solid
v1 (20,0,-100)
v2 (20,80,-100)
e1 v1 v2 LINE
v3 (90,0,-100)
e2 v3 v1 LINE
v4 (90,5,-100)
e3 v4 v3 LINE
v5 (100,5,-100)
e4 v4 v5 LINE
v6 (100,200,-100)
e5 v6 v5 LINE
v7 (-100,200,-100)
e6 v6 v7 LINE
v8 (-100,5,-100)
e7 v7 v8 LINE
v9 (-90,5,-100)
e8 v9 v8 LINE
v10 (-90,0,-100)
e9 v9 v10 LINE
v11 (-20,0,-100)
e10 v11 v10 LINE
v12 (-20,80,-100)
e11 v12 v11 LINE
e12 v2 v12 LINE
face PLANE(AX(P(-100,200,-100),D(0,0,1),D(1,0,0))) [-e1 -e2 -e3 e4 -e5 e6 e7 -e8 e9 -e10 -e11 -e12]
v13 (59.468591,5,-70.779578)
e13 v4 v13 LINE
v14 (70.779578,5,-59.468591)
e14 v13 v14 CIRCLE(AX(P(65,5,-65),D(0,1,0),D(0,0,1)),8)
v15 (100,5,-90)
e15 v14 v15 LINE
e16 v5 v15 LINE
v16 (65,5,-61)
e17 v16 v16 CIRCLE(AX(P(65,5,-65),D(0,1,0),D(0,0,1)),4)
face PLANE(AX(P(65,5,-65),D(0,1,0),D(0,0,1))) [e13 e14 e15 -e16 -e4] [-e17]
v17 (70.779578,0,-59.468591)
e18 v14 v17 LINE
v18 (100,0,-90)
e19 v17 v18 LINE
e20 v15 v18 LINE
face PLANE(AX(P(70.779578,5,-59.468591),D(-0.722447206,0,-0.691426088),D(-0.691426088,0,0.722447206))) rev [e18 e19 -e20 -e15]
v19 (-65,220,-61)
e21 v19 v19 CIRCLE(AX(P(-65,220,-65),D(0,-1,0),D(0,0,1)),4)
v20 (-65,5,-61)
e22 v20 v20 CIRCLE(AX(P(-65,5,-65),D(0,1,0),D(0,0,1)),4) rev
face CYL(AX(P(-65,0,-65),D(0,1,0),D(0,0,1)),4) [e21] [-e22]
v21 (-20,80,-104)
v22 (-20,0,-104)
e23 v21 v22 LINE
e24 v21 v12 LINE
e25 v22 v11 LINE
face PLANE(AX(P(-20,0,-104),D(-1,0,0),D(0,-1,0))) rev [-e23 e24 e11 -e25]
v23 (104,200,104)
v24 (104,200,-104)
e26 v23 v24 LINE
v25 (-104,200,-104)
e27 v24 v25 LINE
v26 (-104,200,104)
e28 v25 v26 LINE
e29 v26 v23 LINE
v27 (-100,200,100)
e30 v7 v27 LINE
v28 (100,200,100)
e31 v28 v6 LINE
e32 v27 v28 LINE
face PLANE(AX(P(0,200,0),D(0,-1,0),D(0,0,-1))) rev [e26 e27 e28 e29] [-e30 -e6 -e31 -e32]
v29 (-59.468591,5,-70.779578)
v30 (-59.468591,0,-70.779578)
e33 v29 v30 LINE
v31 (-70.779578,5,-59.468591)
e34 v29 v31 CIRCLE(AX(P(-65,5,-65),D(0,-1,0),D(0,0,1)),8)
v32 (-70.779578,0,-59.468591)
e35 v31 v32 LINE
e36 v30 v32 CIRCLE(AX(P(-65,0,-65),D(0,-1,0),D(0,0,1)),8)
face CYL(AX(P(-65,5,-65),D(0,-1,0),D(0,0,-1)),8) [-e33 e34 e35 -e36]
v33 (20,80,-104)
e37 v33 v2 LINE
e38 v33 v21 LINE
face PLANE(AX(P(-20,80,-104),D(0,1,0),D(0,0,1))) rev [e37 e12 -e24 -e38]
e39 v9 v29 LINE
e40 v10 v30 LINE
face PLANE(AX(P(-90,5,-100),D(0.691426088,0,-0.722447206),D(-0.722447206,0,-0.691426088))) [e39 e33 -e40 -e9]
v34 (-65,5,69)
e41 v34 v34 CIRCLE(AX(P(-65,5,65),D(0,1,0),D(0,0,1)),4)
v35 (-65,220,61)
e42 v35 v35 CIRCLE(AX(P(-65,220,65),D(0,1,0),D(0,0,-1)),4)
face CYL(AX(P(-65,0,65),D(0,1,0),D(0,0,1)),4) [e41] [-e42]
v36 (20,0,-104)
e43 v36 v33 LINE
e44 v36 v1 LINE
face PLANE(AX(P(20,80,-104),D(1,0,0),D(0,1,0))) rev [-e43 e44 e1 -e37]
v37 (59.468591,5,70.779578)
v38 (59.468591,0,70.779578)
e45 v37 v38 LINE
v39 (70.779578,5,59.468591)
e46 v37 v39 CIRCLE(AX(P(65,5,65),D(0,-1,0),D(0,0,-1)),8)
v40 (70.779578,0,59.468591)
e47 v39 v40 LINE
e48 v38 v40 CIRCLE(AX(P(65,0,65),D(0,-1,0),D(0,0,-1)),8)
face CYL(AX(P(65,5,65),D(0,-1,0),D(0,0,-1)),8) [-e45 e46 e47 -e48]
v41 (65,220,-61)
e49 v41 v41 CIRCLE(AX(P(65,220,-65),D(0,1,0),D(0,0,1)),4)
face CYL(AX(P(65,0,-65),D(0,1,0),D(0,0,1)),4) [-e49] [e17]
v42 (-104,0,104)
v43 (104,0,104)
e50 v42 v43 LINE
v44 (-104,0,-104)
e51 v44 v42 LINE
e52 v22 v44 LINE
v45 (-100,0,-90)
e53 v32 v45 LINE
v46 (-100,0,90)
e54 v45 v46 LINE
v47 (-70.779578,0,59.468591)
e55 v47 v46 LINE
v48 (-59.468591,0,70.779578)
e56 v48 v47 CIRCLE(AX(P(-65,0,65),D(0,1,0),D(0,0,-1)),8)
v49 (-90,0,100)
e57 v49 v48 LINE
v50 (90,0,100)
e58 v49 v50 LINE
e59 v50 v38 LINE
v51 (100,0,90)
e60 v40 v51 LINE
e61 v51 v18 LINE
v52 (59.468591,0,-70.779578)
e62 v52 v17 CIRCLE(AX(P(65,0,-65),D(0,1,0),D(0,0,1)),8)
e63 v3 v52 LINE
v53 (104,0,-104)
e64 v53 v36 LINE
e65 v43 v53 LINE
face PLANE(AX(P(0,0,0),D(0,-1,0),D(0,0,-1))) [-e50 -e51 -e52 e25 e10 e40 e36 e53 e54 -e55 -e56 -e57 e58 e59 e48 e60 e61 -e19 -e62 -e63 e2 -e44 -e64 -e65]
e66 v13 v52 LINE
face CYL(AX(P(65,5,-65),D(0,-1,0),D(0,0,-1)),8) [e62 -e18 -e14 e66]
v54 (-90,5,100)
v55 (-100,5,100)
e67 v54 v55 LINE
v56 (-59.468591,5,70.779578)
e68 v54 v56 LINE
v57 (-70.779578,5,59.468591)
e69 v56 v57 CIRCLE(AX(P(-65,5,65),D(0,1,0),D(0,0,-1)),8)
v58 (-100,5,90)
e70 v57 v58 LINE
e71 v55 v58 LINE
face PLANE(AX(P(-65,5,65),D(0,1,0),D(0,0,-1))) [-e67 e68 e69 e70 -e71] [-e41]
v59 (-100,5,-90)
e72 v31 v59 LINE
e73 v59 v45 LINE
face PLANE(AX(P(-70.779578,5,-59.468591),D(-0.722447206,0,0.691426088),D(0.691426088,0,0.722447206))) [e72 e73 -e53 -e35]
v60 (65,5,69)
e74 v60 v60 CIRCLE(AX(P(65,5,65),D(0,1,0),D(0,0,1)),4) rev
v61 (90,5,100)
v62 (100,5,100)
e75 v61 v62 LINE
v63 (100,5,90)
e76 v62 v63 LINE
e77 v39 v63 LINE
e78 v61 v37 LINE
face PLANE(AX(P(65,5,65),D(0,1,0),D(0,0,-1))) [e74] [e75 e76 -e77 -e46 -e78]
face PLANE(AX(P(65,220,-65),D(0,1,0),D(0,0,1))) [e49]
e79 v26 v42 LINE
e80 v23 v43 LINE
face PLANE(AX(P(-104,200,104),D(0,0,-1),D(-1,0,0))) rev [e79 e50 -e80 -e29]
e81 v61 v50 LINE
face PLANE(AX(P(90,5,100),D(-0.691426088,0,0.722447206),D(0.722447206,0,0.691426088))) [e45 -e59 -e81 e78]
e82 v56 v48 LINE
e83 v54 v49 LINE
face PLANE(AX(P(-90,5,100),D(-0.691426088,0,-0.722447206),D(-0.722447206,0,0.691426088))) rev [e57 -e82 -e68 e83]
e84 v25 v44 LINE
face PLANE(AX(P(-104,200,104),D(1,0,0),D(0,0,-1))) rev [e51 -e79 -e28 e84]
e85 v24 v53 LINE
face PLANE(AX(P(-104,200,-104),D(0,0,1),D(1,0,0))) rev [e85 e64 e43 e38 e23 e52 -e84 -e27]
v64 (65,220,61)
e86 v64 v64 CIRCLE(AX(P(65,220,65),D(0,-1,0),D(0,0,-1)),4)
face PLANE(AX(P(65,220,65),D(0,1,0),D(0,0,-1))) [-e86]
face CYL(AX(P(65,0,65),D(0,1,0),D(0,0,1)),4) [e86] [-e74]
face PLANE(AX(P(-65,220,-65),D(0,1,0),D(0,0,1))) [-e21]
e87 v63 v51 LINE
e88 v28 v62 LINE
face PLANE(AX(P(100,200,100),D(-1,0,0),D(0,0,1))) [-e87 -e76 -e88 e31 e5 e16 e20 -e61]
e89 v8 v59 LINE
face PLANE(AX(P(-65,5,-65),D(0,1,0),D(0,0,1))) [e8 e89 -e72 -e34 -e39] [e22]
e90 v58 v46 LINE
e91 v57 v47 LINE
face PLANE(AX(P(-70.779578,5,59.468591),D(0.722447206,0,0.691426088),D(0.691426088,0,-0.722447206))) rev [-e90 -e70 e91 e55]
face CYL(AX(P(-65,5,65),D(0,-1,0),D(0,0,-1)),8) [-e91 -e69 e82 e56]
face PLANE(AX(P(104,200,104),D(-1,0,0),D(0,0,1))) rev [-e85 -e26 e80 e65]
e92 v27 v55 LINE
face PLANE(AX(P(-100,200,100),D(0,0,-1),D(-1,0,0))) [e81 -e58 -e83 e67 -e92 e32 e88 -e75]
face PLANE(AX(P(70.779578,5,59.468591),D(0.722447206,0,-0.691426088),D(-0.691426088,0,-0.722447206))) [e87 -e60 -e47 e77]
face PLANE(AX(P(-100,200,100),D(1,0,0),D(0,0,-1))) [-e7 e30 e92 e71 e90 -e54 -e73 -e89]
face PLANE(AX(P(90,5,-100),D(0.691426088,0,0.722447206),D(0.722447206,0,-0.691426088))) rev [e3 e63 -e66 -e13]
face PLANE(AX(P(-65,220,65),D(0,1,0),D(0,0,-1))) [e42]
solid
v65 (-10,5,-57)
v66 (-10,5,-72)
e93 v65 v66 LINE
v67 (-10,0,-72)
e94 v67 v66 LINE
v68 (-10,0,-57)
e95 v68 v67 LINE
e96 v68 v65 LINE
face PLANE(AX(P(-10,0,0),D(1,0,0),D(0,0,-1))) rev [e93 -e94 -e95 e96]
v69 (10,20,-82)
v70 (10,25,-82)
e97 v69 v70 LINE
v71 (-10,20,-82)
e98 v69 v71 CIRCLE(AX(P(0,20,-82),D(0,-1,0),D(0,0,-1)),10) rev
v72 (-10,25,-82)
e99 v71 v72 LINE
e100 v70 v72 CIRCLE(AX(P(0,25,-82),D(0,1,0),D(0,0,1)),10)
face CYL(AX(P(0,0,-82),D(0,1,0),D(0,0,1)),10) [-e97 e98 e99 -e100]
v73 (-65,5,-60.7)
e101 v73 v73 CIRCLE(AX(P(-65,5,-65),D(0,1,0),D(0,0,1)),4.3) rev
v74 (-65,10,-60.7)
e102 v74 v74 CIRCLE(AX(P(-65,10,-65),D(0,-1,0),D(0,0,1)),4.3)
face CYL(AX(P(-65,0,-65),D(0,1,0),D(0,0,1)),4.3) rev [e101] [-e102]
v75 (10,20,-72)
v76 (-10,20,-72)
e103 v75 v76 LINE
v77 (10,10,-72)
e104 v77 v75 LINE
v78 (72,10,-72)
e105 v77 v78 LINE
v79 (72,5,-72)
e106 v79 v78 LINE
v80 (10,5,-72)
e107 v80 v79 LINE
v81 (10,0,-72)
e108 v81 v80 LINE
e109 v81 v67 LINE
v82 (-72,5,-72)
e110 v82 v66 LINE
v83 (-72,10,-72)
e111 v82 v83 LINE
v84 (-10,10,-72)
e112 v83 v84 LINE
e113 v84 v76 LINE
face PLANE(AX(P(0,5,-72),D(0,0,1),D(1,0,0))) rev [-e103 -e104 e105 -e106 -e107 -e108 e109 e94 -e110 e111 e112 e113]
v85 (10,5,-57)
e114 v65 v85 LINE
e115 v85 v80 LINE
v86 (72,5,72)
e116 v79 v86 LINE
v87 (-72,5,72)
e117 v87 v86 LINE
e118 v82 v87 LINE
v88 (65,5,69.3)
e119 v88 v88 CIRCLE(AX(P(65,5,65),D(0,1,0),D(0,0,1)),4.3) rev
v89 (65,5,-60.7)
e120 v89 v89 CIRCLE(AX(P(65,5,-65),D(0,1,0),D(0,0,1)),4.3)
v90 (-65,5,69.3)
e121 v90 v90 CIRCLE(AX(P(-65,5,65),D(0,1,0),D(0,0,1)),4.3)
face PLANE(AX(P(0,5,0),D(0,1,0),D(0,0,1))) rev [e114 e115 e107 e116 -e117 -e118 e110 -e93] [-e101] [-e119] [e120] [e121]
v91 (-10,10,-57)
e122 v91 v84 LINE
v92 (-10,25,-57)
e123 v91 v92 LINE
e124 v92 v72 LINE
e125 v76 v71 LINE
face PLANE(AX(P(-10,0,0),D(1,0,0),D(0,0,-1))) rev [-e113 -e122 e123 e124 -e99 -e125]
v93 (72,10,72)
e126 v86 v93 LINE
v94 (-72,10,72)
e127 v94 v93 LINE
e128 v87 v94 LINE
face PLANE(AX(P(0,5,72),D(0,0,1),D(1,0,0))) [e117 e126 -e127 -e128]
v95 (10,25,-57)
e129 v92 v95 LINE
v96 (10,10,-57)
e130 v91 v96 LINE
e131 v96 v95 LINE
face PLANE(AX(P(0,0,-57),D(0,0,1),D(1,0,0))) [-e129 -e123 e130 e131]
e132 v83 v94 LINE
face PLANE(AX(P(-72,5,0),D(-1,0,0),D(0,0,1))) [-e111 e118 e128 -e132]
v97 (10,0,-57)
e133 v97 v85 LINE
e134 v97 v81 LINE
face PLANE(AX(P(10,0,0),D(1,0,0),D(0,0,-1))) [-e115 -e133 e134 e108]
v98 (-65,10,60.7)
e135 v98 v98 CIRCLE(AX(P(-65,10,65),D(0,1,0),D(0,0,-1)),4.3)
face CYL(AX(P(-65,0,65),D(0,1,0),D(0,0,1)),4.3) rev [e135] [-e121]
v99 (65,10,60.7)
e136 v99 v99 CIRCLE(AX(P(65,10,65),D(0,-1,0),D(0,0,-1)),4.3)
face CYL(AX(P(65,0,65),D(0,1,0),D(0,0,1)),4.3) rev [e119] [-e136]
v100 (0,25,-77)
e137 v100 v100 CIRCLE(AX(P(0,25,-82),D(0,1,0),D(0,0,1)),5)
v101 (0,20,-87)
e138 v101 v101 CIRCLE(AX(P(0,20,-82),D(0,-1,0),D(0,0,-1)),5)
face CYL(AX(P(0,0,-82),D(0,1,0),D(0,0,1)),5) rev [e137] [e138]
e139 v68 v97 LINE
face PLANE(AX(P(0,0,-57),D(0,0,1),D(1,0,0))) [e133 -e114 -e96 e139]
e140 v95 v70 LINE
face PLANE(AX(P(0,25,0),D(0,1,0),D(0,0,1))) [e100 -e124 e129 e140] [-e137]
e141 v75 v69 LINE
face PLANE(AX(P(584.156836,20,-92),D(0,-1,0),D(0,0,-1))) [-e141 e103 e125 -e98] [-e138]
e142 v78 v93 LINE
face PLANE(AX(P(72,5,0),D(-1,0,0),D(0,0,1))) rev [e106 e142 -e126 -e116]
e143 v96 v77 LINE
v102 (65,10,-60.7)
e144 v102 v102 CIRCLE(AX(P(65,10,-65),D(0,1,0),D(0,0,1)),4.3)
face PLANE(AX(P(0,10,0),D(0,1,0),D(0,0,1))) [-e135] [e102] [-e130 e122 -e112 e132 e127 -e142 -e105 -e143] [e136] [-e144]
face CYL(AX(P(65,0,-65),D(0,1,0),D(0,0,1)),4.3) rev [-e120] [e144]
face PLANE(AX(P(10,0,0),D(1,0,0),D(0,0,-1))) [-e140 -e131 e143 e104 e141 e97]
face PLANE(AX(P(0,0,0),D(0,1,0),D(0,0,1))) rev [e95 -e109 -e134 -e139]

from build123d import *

# Parameters (mm, degrees)
SKETCH1_W                                  = 208
SKETCH1_H                                  = 208
SKETCH1_W_2                                = 200
SKETCH1_H_2                                = 200
BOSS_EXTRUDE1_DEPTH                        = 200
SKETCH3_W                                  = 40
SKETCH3_H                                  = 80
CUT_EXTRUDE1_DEPTH                         = 249.257930387
SKETCH4_W                                  = 144
SKETCH4_H                                  = 144
BOSS_EXTRUDE3_DEPTH                        = 5
BOSS_EXTRUDE4_DEPTH                        = 5
SKETCH4_5_R                                = 4
BOSS_EXTRUDE5_DEPTH                        = 210
BOSS_EXTRUDE5_DIRECTION_2_REACH            = 242.275
MIRROR2_OUTLINE_R                          = 4
MIRROR2_DEPTH                              = 220
MIRROR2_2_OUTLINE_R                        = 4
MIRROR2_2_DEPTH                            = 5
SKETCH8_R                                  = 10
BOSS_EXTRUDE7_DEPTH                        = 25
CUT_EXTRUDE3_DEPTH                         = 265.635598512
CUT_EXTRUDE3_DEPTH_BACK                    = 265.635598512
SKETCH11_R                                 = 5
CUT_EXTRUDE4_DEPTH                         = 245.247824965
SKETCH12_R                                 = 4.3
CUT_EXTRUDE5_DEPTH                         = 257.382526706
MIRROR3_AT_THE_SECOND_PLANE_COPY_1_SKETC_R = 4.3
MIRROR3_AT_THE_SECOND_PLANE_COPY_1_DEPTH   = 257.382526706


# Read off the part's stored shape, not the designer's step: Mirror2
with BuildPart() as part:
    # Sketch1 → Boss-Extrude1 (new body)
    with BuildSketch(Plane(origin=(0, 0, 0), x_dir=(1, 0, 0), z_dir=(0, 1, 0))):
        Rectangle(SKETCH1_W, SKETCH1_H)
        Rectangle(SKETCH1_W_2, SKETCH1_H_2, mode=Mode.SUBTRACT)
    extrude(amount=BOSS_EXTRUDE1_DEPTH)

    # Sketch3 → Cut-Extrude1 (cut, through all)
    with BuildSketch(Plane.XY):
        with Locations((0, 40)):
            Rectangle(SKETCH3_W, SKETCH3_H)
    extrude(amount=-CUT_EXTRUDE1_DEPTH, mode=Mode.SUBTRACT)

    # Sketch5 → Boss-Extrude4 (add)
    with BuildSketch(Plane(origin=(0, 0, 0), x_dir=(1, 0, 0), z_dir=(0, 1, 0))):
        with BuildLine():
            Line((90, 100), (59.468591297, 70.779577645))
            ThreePointArc((59.468591297, 70.779577645), (59.343145751, 59.343145751), (70.779577645, 59.468591297))
            Line((70.779577645, 59.468591297), (100, 90))
            Line((100, 90), (100, 100))
            Line((100, 100), (90, 100))
        make_face()
    extrude(amount=BOSS_EXTRUDE4_DEPTH)

    # Sketch4<5> → Boss-Extrude5 (add)
    with BuildSketch(Plane(origin=(0, 10, 0), x_dir=(1, 0, 0), z_dir=(0, 1, 0))):
        with Locations(Location((65, 65, 0), (0, 0, 270))):
            Circle(SKETCH4_5_R)
    extrude(amount=BOSS_EXTRUDE5_DEPTH)

    # Sketch4<5> → Boss-Extrude5 direction 2 (add, up to next)
    with BuildSketch(Plane(origin=(0, 10, 0), x_dir=(1, 0, 0), z_dir=(0, 1, 0)), mode=Mode.PRIVATE) as boss_extrude5_direction_2_sk1:
        with Locations(Location((65, 65, 0), (0, 0, 270))):
            Circle(SKETCH4_5_R)
    boss_extrude5_direction_2_tool1 = extrude(boss_extrude5_direction_2_sk1.sketch, amount=-BOSS_EXTRUDE5_DIRECTION_2_REACH, mode=Mode.PRIVATE) - part.part
    add(boss_extrude5_direction_2_tool1.solids().sort_by_distance((65, 10, -65))[0])



with BuildPart() as body_2:
    # Sketch4 → Boss-Extrude3 (new body)
    with BuildSketch(Plane(origin=(0, 10, 0), x_dir=(1, 0, 0), z_dir=(0, 1, 0))):
        Rectangle(SKETCH4_W, SKETCH4_H)
    extrude(amount=-BOSS_EXTRUDE3_DEPTH)

    # Sketch8 → Boss-Extrude7 (add, through all)
    with BuildSketch(Plane(origin=(0, 25, 0), x_dir=(1, 0, 0), z_dir=(0, 1, 0))):
        with Locations((0, 82)):
            Circle(SKETCH8_R)
        with BuildLine():
            Line((-10, 82), (-10, 57))
            Line((-10, 57), (10, 57))
            Line((10, 57), (10, 82))
            ThreePointArc((10, 82), (0, 72), (-10, 82))
        make_face()
    extrude(amount=-BOSS_EXTRUDE7_DEPTH)

    # Sketch10 → Cut-Extrude3 (cut, two sides: drawn at the far end of the back side and taken through both)
    with BuildSketch(Plane(origin=(0, 0, 0), x_dir=(0, 0, -1), z_dir=(1, 0, 0)).offset(-CUT_EXTRUDE3_DEPTH_BACK)):
        Polygon((665.474932894, 20), (92, 20), (72, 20), (72, 0), (72, -573.474932894), (883.01602778, -1384.490960674), (1476.490960674, -791.01602778), align=None)
    extrude(amount=CUT_EXTRUDE3_DEPTH + CUT_EXTRUDE3_DEPTH_BACK, mode=Mode.SUBTRACT)

    # Sketch11 → Cut-Extrude4 (cut, through all)
    with BuildSketch(Plane(origin=(0, 25, 0), x_dir=(1, 0, 0), z_dir=(0, 1, 0))):
        with Locations(Location((0, 82, 0), (0, 0, 270))):
            Circle(SKETCH11_R)
    extrude(amount=-CUT_EXTRUDE4_DEPTH, mode=Mode.SUBTRACT)

    # Sketch12 → Cut-Extrude5 (cut, through all)
    with BuildSketch(Plane(origin=(0, 10, 0), x_dir=(1, 0, 0), z_dir=(0, 1, 0))):
        with Locations(Location((65, 65, 0), (0, 0, 270))):
            Circle(SKETCH12_R)
    cut_extrude5 = extrude(amount=-CUT_EXTRUDE5_DEPTH, mode=Mode.SUBTRACT)

    # Mirror3: Cut-Extrude5 across plane
    add(cut_extrude5.mirror(Plane.XY), mode=Mode.SUBTRACT)

    # Mirror3 at the second plane: Cut-Extrude5 across plane
    add(cut_extrude5.mirror(Plane(origin=(0, 0, 0), x_dir=(0, 0, 1), z_dir=(1, 0, 0))), mode=Mode.SUBTRACT)

    # Mirror3 at the second plane copy 1 sketc → Mirror3 at the second plane copy 1 (cut, through all)
    with BuildSketch(Plane(origin=(0, 10, 0), x_dir=(-1, 0, 0), z_dir=(0, 1, 0))):
        with Locations(Location((65, 65, 0), (0, 0, 270))):
            Circle(MIRROR3_AT_THE_SECOND_PLANE_COPY_1_SKETC_R)
    extrude(amount=-MIRROR3_AT_THE_SECOND_PLANE_COPY_1_DEPTH, mode=Mode.SUBTRACT)


with BuildPart() as body_3:
    # Mirror2 outline → Mirror2 (new body)
    with BuildSketch(Plane(origin=(0, 0, 0), x_dir=(1, 0, 0), z_dir=(0, 1, 0))):
        with Locations((65, -65)):
            Circle(MIRROR2_OUTLINE_R)
        with Locations((-65, 65)):
            Circle(MIRROR2_OUTLINE_R)
        with Locations((-65, -65)):
            Circle(MIRROR2_OUTLINE_R)
    extrude(amount=MIRROR2_DEPTH)


with BuildPart() as part_1:
    add(part.part)

    add(body_3.part)  # Mirror2 2 merges body 3
    # Mirror2 2 outline → Mirror2 2 (add)
    # profile 1 of 3: a face of its own
    with BuildSketch(Plane(origin=(0, 0, 0), x_dir=(1, 0, 0), z_dir=(0, 1, 0))):
        with BuildLine():
            ThreePointArc((70.779577645, -59.468591297), (59.343145751, -59.343145751), (59.468591297, -70.779577645))
            Line((59.468591297, -70.779577645), (90, -100))
            Line((90, -100), (100, -100))
            Line((100, -100), (100, -90))
            Line((100, -90), (70.779577645, -59.468591297))
        make_face()
        with Locations((65, -65)):
            Circle(MIRROR2_2_OUTLINE_R, mode=Mode.SUBTRACT)
    # profile 2 of 3: a face of its own
    with BuildSketch(Plane(origin=(0, 0, 0), x_dir=(1, 0, 0), z_dir=(0, 1, 0))):
        with BuildLine():
            Line((-100, -100), (-90, -100))
            Line((-90, -100), (-59.468591297, -70.779577645))
            ThreePointArc((-59.468591297, -70.779577645), (-59.343145751, -59.343145751), (-70.779577645, -59.468591297))
            Line((-70.779577645, -59.468591297), (-100, -90))
            Line((-100, -90), (-100, -100))
        make_face()
        with Locations((-65, -65)):
            Circle(MIRROR2_2_OUTLINE_R, mode=Mode.SUBTRACT)
    # profile 3 of 3: a face of its own
    with BuildSketch(Plane(origin=(0, 0, 0), x_dir=(1, 0, 0), z_dir=(0, 1, 0))):
        with BuildLine():
            Line((-59.468591297, 70.779577645), (-90, 100))
            Line((-90, 100), (-100, 100))
            Line((-100, 100), (-100, 90))
            Line((-100, 90), (-70.779577645, 59.468591297))
            ThreePointArc((-70.779577645, 59.468591297), (-59.343145751, 59.343145751), (-59.468591297, 70.779577645))
        make_face()
        with Locations((-65, 65)):
            Circle(MIRROR2_2_OUTLINE_R, mode=Mode.SUBTRACT)
    extrude(amount=MIRROR2_2_DEPTH)


solid = Compound([body_2.part, part_1.part])
